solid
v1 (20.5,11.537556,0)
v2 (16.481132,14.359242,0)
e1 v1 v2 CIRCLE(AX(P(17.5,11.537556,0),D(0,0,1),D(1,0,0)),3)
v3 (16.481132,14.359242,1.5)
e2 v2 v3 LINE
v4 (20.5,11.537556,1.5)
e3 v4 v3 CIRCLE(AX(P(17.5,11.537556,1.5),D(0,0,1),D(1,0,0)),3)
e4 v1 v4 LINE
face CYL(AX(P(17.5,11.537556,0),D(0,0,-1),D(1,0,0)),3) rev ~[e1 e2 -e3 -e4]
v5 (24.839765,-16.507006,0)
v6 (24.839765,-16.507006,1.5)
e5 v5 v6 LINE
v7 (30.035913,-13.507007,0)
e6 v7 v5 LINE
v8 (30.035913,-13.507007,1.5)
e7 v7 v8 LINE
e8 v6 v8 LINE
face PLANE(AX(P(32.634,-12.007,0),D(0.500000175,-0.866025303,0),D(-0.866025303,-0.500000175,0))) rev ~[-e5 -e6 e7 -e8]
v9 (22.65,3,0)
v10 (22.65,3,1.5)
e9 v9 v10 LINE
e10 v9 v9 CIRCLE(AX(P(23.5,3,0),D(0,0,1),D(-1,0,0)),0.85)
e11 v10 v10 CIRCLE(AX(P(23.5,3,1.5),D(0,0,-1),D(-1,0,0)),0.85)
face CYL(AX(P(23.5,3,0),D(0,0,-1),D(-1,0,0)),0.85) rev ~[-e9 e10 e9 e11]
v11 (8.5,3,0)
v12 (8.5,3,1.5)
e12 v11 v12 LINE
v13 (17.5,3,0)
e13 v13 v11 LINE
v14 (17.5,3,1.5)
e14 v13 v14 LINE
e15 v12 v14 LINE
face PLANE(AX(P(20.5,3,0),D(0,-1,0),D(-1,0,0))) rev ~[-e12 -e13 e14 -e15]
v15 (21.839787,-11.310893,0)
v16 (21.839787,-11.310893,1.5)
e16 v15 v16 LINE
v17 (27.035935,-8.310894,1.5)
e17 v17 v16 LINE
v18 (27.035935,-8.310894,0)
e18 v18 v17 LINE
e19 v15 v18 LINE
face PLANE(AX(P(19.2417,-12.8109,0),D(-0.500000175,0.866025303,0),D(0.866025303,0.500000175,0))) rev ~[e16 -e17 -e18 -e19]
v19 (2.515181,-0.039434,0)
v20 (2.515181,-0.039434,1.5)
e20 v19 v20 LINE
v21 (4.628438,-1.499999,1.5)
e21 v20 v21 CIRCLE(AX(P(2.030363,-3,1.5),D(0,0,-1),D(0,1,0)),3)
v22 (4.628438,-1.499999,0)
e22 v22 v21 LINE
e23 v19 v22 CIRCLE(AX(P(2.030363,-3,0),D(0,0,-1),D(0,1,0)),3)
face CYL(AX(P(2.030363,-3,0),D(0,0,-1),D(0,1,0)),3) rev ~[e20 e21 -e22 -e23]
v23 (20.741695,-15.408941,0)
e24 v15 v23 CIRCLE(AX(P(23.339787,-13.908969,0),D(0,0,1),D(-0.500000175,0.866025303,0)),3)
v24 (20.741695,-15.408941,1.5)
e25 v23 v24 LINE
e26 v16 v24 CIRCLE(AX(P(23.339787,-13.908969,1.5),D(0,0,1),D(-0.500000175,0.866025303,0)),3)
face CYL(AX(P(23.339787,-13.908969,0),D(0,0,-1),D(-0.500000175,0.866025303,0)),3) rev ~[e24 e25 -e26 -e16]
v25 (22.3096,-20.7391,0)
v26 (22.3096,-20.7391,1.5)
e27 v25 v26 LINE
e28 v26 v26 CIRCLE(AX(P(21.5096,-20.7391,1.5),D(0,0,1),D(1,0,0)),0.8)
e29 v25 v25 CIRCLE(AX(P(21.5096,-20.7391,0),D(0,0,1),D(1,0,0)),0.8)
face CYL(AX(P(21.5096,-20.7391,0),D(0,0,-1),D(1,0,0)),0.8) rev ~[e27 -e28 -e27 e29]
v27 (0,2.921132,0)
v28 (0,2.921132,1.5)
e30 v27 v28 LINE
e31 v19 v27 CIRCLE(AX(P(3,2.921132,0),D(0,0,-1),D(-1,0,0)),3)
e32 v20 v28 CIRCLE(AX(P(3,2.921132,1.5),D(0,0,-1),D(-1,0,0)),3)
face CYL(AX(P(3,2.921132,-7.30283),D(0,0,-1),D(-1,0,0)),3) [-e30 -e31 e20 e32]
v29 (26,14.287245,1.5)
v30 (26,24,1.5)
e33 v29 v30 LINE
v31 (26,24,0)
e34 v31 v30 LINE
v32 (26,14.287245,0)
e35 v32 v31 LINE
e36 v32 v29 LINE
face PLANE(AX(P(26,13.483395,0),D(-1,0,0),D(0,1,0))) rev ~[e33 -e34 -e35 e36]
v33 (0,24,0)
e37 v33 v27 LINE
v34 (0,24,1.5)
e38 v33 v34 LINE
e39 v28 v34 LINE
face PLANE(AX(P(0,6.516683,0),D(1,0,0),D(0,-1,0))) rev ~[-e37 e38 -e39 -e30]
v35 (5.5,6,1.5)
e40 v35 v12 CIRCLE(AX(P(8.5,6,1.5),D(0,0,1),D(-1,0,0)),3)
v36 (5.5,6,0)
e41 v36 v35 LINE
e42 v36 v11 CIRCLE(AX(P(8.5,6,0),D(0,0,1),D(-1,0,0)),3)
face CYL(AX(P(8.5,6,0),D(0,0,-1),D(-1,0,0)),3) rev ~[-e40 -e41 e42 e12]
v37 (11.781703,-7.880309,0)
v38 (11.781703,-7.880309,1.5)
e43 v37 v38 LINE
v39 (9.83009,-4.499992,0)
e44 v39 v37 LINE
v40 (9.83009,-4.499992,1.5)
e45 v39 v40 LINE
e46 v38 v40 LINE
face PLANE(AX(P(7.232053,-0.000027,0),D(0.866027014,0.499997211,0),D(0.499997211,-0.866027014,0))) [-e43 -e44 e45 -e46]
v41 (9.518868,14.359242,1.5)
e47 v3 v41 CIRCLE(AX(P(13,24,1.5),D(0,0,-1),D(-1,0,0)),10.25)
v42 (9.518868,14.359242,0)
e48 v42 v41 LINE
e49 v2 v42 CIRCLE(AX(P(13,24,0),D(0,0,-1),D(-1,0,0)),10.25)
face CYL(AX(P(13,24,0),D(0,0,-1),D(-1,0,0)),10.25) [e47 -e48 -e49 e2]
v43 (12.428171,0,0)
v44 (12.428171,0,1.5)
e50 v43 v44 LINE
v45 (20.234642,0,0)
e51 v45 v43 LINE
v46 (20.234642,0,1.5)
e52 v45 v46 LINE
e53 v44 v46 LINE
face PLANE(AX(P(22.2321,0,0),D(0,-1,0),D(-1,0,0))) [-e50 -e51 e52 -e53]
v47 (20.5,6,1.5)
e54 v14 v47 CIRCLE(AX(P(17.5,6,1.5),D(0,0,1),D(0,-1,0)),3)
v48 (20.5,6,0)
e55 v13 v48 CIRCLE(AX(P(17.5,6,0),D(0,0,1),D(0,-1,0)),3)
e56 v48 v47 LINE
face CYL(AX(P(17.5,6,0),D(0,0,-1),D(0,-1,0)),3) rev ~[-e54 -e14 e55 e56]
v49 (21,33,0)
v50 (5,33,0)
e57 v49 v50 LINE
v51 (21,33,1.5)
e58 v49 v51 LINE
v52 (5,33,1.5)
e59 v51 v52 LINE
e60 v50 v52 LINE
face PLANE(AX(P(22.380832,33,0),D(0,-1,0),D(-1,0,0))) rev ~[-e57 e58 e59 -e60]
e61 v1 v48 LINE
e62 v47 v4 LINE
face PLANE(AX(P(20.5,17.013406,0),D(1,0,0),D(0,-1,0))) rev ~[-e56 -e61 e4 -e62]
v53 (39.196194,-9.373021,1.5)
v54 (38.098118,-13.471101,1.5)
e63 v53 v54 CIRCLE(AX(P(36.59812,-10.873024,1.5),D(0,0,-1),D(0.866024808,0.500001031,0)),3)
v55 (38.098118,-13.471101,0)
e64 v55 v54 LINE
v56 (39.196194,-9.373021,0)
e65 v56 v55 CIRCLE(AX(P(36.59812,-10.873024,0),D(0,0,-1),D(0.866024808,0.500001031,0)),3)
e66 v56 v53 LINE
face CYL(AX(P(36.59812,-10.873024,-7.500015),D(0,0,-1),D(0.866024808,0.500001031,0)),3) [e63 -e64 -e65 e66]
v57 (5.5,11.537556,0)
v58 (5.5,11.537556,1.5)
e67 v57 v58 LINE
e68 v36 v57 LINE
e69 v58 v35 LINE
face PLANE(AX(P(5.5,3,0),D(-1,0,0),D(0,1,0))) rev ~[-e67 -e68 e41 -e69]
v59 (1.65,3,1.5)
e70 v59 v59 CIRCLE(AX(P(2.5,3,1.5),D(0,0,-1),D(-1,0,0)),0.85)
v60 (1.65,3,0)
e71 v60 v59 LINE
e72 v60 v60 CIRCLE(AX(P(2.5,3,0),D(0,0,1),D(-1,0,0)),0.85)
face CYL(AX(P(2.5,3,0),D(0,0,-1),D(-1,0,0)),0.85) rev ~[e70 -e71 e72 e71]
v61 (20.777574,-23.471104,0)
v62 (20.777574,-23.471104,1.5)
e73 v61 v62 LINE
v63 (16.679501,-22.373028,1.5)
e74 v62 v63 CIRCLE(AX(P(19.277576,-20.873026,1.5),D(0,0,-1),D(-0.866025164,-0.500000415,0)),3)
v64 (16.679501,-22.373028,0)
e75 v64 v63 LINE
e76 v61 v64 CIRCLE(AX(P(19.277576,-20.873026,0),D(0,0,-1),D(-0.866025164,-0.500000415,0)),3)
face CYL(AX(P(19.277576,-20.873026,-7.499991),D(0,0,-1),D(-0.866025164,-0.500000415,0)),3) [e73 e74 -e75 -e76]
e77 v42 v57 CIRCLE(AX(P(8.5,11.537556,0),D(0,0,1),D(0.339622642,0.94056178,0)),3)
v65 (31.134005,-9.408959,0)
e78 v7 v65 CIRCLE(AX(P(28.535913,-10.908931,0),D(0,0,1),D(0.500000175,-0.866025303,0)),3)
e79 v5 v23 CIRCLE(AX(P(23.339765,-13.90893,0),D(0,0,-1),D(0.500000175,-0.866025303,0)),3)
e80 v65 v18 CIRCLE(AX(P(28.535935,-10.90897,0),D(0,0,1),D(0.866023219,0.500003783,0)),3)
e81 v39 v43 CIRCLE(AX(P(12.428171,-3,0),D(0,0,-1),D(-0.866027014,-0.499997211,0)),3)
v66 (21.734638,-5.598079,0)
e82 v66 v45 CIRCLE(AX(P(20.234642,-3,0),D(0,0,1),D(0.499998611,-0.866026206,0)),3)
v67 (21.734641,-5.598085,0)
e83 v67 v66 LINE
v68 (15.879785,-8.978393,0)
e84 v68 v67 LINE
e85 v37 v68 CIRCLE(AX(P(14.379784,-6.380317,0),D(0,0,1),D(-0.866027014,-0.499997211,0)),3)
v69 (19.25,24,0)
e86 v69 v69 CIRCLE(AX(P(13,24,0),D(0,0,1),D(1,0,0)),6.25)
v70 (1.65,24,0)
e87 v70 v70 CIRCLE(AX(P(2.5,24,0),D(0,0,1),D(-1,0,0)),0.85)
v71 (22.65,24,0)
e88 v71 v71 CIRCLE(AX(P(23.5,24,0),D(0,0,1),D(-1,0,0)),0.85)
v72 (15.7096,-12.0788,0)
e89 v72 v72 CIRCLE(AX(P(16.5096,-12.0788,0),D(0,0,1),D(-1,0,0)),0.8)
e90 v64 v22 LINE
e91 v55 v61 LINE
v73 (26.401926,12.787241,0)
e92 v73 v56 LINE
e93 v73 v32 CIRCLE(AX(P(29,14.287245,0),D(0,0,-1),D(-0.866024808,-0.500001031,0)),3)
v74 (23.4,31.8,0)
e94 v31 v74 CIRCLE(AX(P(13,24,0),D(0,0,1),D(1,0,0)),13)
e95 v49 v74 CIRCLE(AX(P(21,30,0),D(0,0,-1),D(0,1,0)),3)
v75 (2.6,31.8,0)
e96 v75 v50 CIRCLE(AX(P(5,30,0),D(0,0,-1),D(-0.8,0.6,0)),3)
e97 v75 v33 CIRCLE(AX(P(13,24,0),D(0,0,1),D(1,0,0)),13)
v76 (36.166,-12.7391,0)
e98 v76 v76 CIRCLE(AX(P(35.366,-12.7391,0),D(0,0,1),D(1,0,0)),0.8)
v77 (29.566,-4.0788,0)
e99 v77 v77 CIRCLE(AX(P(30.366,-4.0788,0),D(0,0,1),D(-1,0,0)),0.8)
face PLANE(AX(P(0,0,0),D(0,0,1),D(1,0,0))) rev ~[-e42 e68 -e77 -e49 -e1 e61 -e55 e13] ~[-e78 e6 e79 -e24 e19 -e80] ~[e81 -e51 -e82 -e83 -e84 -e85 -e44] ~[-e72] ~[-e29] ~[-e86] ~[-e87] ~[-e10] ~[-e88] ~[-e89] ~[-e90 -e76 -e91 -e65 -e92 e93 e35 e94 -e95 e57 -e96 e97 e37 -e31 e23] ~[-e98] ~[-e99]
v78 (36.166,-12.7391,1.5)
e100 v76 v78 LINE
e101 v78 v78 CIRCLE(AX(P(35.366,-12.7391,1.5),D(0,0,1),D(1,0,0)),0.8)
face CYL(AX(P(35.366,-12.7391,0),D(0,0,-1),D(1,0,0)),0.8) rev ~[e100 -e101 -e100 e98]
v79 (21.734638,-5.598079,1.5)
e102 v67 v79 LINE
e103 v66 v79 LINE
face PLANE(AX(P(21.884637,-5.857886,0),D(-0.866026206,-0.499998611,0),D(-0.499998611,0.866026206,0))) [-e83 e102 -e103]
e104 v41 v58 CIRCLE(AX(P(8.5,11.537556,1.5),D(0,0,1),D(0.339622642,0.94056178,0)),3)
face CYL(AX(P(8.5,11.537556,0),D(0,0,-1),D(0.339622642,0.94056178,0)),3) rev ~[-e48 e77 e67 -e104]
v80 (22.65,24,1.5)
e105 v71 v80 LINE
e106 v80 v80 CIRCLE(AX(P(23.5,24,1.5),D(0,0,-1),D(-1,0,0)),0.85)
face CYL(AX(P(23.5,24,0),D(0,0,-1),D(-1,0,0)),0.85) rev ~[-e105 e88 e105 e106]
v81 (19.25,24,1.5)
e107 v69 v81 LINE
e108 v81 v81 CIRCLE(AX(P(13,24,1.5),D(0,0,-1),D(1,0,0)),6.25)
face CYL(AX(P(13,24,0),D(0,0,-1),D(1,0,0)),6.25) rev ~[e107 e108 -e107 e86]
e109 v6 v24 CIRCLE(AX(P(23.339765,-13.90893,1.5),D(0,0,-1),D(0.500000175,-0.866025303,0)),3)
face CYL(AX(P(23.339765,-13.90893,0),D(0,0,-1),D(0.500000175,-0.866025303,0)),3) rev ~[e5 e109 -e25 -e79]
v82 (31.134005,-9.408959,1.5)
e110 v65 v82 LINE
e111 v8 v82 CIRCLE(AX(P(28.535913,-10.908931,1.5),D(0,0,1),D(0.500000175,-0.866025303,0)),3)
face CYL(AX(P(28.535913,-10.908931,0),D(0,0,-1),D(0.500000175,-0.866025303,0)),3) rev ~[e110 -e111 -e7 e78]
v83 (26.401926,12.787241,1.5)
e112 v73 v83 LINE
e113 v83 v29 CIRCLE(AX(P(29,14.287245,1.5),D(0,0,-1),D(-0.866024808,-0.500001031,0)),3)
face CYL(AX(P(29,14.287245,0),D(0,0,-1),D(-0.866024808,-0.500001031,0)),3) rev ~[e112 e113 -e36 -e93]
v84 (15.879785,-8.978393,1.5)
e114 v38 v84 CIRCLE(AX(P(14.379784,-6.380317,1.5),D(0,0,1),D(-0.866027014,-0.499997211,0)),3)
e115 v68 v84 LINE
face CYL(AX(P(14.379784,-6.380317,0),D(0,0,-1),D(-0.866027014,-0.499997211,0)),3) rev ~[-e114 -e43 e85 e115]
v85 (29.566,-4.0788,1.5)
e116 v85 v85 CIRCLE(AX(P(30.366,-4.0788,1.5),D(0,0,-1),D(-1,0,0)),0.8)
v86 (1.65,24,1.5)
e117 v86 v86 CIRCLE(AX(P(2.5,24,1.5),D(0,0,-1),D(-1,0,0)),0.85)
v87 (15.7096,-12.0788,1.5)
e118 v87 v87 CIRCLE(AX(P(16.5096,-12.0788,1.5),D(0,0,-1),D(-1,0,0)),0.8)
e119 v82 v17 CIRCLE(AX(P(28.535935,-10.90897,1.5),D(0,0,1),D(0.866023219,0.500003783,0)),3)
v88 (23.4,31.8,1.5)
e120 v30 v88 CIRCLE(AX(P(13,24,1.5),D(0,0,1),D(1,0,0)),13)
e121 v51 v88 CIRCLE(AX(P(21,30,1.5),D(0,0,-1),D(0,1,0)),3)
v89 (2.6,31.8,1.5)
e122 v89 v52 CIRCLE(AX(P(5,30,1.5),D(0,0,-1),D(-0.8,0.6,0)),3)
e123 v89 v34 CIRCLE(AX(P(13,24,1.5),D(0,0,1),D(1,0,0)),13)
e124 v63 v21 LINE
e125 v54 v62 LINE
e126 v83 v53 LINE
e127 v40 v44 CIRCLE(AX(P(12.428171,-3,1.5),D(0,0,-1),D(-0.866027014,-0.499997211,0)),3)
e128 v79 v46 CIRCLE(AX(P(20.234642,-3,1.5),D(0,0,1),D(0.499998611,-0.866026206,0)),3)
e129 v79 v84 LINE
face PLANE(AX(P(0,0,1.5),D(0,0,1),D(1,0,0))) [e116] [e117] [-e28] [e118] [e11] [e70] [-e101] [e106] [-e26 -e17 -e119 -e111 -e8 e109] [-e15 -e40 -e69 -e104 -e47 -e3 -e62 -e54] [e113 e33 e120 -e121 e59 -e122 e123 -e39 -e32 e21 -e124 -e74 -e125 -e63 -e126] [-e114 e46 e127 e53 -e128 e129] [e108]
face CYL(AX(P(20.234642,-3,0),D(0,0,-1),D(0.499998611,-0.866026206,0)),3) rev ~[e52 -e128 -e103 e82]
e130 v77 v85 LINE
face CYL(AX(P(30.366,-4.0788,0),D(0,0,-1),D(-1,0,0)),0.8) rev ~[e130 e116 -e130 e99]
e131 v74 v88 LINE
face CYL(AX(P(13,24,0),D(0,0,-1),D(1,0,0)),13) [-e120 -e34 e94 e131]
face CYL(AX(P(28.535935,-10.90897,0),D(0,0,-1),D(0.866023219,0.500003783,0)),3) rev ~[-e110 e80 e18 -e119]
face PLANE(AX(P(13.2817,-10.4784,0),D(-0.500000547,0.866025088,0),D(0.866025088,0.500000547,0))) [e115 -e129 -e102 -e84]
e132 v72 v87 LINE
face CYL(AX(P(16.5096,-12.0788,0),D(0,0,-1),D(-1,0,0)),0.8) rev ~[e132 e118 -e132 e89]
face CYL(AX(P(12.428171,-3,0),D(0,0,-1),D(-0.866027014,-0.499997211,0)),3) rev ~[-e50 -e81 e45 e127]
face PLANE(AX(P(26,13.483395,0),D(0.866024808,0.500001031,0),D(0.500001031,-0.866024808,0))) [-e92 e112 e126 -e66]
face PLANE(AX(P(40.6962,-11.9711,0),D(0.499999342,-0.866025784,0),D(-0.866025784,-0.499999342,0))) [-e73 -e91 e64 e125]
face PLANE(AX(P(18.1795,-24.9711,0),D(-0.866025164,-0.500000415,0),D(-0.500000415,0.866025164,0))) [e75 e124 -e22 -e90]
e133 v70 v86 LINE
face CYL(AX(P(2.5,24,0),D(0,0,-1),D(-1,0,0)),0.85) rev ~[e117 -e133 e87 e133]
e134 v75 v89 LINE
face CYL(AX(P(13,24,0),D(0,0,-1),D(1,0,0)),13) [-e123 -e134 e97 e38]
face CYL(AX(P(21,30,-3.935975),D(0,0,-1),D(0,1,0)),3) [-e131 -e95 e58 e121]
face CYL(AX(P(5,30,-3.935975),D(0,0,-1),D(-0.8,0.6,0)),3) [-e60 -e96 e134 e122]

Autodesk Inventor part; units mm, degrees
ref_plane "YZ Plane" through (0, 0, 0) normal (1, 0, 0) x (0, 1, 0)
ref_plane "XZ Plane" through (0, 0, 0) normal (0, 1, 0) x (-1, 0, 0)
ref_plane "XY Plane" through (0, 0, 0) normal (0, 0, 1) x (1, 0, 0)
sketch "スケッチ2" plane through (0, 0, 0) normal (0, 0, 1) x (1, 0, 0)
  line L0 (0, 0) -> (26, 0)
  line L1 (26, 0) -> (26, 33)
  line L2 (26, 33) -> (0, 33)
  line L3 (0, 33) -> (0, 0)
  line L4 (0, 0) -> (26, 0)
  line L5 (26, 0) -> (26, 24)
  line L6 (26, 24) -> (0, 24) construction
  line L7 (0, 24) -> (0, 0)
  circle A0 centre (13, 24) radius 13
  circle A1 centre (13, 24) radius 6.25
  line L8 (26, 0) -> (0, 0)
  line L9 (17.9352, 27.452) -> (40.6962, -11.9711)
  line L10 (40.6962, -11.9711) -> (18.1795, -24.9711)
  line L11 (18.1795, -24.9711) -> (-4.3205, 14)
  circle A2 centre (21.5096, -20.7391) radius 0.8
  circle A3 centre (35.366, -12.7391) radius 0.8
  line L12 (-4.3205, 14) -> (18.1962, 27)
  point P0 (22.3808, 33)
  point P1 (3.6192, 33)
  point P2 (26, 13.4833)
  point P3 (3.7624, 0)
  point P4 (23.9624, 17.0125)
  point P5 (1.7417, 17.5)
  point P6 (0, 16.4944)
  point P7 (0, 6.5167)
  point P8 (7.5873, 20.875)
  point P9 (19.0712, 25.4845)
  dimension "d0" = 26
  dimension "d1" = 33
  dimension "d2" = 24
  dimension "d3" = 12.5
  dimension "d14" = 26
  dimension "d17" = 1.6
  dimension "d18" = 1.6
  dimension "d19" = 2
  dimension "d20" = 2
  dimension "d21" = 5
  dimension "d22" = 5
  dimension "d23" = 20
  dimension "d25" = 45
  dimension "d26" = 30
extrude "押し出し1" add sketch "スケッチ2" along normal blind 1.5 contours L3 L11 L0 | L11 L3 L12 A0 L9 L1 L0 | L0 L1 L9 L10 L11 | L3 A0 L12 | L9 A0 L1 | A0 L2 L9 A1 L12 | L12 A1 L9 A0
sketch "スケッチ3" plane through (0, 0, 0) normal (0, 0, -1) x (-1, 0, 0)
  circle A0 centre (-2.5, 24) radius 0.85 projected
  circle A1 centre (-23.5, 24) radius 0.85 projected
  circle A2 centre (-23.5, 3) radius 0.85 projected
  circle A3 centre (-2.5, 3) radius 0.85 projected
  circle A4 centre (-30.366, -4.0788) radius 0.8 projected
  circle A5 centre (-16.5096, -12.0788) radius 0.8 projected
  circle A6 centre (-13, 24) radius 6.25 projected
  line L0 (-2.5, 24) -> (-23.5, 24)
  line L1 (-23.5, 24) -> (-23.5, 3)
  line L2 (-23.5, 3) -> (-2.5, 3)
  line L3 (-2.5, 3) -> (-2.5, 24)
  circle A7 centre (-13, 24) radius 10.25
  line L4 (-5.5, 24) -> (-20.5, 24)
  line L5 (-20.5, 24) -> (-20.5, 3)
  line L6 (-20.5, 3) -> (-5.5, 3)
  line L7 (-5.5, 3) -> (-5.5, 24)
  line L8 (-3.7624, 0) -> (-18.1795, -24.9711) projected
  line L9 (0, 24) -> (0, 0) projected
  arc A8 (0, 24) -> (-3.6192, 33) centre (-13, 24) ccw projected
  line L10 (-22.3808, 33) -> (-3.6192, 33) projected
  arc A9 (-22.3808, 33) -> (-26, 24) centre (-13, 24) ccw projected
  line L11 (-26, 13.4833) -> (-26, 24) projected
  line L12 (-40.6962, -11.9711) -> (-26, 13.4833) projected
  line L13 (-18.1795, -24.9711) -> (-40.6962, -11.9711) projected
  line L14 (-3.7624, 0) -> (-18.1795, -24.9711) projected
  line L15 (0, 0) -> (-3.7624, 0) projected
  circle A10 centre (-13, 24) radius 6.25 projected
  circle A11 centre (-21.5096, -20.7391) radius 0.8 projected
  circle A12 centre (-35.366, -12.7391) radius 0.8 projected
  line L16 (-21.5096, -20.7391) -> (-16.5096, -12.0788)
  line L17 (-16.5096, -12.0788) -> (-30.366, -4.0788)
  line L18 (-30.366, -4.0788) -> (-35.366, -12.7391)
  line L19 (-35.366, -12.7391) -> (-21.5096, -20.7391)
  line L20 (-22.2417, -18.007) -> (-19.2417, -12.8109)
  line L21 (-19.2417, -12.8109) -> (-29.634, -6.8109)
  line L22 (-29.634, -6.8109) -> (-32.634, -12.007)
  line L23 (-32.634, -12.007) -> (-22.2417, -18.007)
  line L24 (-13.2817, -10.4784) -> (-24.5317, -3.9832)
  line L25 (-24.5317, -3.9832) -> (-16.75, 9.4952)
  line L26 (-16.75, 9.4952) -> (-5.5, 3)
  line L27 (-5.5, 3) -> (-13.2817, -10.4784)
  line L28 (-24.5317, -3.9832) -> (-28.866, -1.4808)
  line L29 (-28.866, -1.4808) -> (-28.0111, 0)
  line L30 (-28.0111, 0) -> (-22.2321, 0)
  line L31 (-22.2321, 0) -> (-7.2321, 0)
  point P0 (-5.5, 17.0134)
  point P1 (-20.5, 17.0134)
  dimension "d27" = 4
  dimension "d28" = 3
  dimension "d29" = 3
  dimension "d31" = 2
  dimension "d32" = 2
  dimension "d33" = 2
  dimension "d34" = 2
  dimension "d35" = 3
  dimension "d36" = 3
extrude "押し出し2" cut sketch "スケッチ3" against normal through all contours A0 L3 L0 A7 | A7 L0 A0 | A0 A7 L0 L3 | L0 A7 A0 | L3 L2 A3 | A3 L2 L3 | L7 L26 L25 L5 A7 | A7 L0 L1 A1 | A1 L0 A7 | L2 L25 L26 | A1 A7 L0 | L1 L0 A7 A1 | L27 L24 L25 L31 | L1 L2 A2 | A2 L2 L1 | L25 L28 L29 L30 | A4 L17 L18 | L18 L17 A4 | L17 L16 A5 | A5 L16 L17 | L23 L22 L21 L20
fillet "フィレット1" radius 3 19 edges at (20.5, 3, 0.75) (5.5, 3, 0.75) (20.5, 17.0134, 0.75) (5.5, 17.0134, 0.75) (7.2321, 0, 0.75) (13.2817, -10.4784, 0.75) (28.0111, 0, 0.75) (28.866, -1.4808, 0.75) (29.634, -6.8109, 0.75) (32.634, -12.007, 0.75) (22.2417, -18.007, 0.75) (19.2417, -12.8109, 0.75) (40.6962, -11.9711, 0.75) (18.1795, -24.9711, 0.75) (3.7624, 0, 0.75) (0, 0, 0.75) (26, 13.4833, 0.75) (22.3808, 33, 0.75) (3.6192, 33, 0.75)
equation "\"d20\" = d19"
properties part number "elbow" material "アルミニウム 6061"
